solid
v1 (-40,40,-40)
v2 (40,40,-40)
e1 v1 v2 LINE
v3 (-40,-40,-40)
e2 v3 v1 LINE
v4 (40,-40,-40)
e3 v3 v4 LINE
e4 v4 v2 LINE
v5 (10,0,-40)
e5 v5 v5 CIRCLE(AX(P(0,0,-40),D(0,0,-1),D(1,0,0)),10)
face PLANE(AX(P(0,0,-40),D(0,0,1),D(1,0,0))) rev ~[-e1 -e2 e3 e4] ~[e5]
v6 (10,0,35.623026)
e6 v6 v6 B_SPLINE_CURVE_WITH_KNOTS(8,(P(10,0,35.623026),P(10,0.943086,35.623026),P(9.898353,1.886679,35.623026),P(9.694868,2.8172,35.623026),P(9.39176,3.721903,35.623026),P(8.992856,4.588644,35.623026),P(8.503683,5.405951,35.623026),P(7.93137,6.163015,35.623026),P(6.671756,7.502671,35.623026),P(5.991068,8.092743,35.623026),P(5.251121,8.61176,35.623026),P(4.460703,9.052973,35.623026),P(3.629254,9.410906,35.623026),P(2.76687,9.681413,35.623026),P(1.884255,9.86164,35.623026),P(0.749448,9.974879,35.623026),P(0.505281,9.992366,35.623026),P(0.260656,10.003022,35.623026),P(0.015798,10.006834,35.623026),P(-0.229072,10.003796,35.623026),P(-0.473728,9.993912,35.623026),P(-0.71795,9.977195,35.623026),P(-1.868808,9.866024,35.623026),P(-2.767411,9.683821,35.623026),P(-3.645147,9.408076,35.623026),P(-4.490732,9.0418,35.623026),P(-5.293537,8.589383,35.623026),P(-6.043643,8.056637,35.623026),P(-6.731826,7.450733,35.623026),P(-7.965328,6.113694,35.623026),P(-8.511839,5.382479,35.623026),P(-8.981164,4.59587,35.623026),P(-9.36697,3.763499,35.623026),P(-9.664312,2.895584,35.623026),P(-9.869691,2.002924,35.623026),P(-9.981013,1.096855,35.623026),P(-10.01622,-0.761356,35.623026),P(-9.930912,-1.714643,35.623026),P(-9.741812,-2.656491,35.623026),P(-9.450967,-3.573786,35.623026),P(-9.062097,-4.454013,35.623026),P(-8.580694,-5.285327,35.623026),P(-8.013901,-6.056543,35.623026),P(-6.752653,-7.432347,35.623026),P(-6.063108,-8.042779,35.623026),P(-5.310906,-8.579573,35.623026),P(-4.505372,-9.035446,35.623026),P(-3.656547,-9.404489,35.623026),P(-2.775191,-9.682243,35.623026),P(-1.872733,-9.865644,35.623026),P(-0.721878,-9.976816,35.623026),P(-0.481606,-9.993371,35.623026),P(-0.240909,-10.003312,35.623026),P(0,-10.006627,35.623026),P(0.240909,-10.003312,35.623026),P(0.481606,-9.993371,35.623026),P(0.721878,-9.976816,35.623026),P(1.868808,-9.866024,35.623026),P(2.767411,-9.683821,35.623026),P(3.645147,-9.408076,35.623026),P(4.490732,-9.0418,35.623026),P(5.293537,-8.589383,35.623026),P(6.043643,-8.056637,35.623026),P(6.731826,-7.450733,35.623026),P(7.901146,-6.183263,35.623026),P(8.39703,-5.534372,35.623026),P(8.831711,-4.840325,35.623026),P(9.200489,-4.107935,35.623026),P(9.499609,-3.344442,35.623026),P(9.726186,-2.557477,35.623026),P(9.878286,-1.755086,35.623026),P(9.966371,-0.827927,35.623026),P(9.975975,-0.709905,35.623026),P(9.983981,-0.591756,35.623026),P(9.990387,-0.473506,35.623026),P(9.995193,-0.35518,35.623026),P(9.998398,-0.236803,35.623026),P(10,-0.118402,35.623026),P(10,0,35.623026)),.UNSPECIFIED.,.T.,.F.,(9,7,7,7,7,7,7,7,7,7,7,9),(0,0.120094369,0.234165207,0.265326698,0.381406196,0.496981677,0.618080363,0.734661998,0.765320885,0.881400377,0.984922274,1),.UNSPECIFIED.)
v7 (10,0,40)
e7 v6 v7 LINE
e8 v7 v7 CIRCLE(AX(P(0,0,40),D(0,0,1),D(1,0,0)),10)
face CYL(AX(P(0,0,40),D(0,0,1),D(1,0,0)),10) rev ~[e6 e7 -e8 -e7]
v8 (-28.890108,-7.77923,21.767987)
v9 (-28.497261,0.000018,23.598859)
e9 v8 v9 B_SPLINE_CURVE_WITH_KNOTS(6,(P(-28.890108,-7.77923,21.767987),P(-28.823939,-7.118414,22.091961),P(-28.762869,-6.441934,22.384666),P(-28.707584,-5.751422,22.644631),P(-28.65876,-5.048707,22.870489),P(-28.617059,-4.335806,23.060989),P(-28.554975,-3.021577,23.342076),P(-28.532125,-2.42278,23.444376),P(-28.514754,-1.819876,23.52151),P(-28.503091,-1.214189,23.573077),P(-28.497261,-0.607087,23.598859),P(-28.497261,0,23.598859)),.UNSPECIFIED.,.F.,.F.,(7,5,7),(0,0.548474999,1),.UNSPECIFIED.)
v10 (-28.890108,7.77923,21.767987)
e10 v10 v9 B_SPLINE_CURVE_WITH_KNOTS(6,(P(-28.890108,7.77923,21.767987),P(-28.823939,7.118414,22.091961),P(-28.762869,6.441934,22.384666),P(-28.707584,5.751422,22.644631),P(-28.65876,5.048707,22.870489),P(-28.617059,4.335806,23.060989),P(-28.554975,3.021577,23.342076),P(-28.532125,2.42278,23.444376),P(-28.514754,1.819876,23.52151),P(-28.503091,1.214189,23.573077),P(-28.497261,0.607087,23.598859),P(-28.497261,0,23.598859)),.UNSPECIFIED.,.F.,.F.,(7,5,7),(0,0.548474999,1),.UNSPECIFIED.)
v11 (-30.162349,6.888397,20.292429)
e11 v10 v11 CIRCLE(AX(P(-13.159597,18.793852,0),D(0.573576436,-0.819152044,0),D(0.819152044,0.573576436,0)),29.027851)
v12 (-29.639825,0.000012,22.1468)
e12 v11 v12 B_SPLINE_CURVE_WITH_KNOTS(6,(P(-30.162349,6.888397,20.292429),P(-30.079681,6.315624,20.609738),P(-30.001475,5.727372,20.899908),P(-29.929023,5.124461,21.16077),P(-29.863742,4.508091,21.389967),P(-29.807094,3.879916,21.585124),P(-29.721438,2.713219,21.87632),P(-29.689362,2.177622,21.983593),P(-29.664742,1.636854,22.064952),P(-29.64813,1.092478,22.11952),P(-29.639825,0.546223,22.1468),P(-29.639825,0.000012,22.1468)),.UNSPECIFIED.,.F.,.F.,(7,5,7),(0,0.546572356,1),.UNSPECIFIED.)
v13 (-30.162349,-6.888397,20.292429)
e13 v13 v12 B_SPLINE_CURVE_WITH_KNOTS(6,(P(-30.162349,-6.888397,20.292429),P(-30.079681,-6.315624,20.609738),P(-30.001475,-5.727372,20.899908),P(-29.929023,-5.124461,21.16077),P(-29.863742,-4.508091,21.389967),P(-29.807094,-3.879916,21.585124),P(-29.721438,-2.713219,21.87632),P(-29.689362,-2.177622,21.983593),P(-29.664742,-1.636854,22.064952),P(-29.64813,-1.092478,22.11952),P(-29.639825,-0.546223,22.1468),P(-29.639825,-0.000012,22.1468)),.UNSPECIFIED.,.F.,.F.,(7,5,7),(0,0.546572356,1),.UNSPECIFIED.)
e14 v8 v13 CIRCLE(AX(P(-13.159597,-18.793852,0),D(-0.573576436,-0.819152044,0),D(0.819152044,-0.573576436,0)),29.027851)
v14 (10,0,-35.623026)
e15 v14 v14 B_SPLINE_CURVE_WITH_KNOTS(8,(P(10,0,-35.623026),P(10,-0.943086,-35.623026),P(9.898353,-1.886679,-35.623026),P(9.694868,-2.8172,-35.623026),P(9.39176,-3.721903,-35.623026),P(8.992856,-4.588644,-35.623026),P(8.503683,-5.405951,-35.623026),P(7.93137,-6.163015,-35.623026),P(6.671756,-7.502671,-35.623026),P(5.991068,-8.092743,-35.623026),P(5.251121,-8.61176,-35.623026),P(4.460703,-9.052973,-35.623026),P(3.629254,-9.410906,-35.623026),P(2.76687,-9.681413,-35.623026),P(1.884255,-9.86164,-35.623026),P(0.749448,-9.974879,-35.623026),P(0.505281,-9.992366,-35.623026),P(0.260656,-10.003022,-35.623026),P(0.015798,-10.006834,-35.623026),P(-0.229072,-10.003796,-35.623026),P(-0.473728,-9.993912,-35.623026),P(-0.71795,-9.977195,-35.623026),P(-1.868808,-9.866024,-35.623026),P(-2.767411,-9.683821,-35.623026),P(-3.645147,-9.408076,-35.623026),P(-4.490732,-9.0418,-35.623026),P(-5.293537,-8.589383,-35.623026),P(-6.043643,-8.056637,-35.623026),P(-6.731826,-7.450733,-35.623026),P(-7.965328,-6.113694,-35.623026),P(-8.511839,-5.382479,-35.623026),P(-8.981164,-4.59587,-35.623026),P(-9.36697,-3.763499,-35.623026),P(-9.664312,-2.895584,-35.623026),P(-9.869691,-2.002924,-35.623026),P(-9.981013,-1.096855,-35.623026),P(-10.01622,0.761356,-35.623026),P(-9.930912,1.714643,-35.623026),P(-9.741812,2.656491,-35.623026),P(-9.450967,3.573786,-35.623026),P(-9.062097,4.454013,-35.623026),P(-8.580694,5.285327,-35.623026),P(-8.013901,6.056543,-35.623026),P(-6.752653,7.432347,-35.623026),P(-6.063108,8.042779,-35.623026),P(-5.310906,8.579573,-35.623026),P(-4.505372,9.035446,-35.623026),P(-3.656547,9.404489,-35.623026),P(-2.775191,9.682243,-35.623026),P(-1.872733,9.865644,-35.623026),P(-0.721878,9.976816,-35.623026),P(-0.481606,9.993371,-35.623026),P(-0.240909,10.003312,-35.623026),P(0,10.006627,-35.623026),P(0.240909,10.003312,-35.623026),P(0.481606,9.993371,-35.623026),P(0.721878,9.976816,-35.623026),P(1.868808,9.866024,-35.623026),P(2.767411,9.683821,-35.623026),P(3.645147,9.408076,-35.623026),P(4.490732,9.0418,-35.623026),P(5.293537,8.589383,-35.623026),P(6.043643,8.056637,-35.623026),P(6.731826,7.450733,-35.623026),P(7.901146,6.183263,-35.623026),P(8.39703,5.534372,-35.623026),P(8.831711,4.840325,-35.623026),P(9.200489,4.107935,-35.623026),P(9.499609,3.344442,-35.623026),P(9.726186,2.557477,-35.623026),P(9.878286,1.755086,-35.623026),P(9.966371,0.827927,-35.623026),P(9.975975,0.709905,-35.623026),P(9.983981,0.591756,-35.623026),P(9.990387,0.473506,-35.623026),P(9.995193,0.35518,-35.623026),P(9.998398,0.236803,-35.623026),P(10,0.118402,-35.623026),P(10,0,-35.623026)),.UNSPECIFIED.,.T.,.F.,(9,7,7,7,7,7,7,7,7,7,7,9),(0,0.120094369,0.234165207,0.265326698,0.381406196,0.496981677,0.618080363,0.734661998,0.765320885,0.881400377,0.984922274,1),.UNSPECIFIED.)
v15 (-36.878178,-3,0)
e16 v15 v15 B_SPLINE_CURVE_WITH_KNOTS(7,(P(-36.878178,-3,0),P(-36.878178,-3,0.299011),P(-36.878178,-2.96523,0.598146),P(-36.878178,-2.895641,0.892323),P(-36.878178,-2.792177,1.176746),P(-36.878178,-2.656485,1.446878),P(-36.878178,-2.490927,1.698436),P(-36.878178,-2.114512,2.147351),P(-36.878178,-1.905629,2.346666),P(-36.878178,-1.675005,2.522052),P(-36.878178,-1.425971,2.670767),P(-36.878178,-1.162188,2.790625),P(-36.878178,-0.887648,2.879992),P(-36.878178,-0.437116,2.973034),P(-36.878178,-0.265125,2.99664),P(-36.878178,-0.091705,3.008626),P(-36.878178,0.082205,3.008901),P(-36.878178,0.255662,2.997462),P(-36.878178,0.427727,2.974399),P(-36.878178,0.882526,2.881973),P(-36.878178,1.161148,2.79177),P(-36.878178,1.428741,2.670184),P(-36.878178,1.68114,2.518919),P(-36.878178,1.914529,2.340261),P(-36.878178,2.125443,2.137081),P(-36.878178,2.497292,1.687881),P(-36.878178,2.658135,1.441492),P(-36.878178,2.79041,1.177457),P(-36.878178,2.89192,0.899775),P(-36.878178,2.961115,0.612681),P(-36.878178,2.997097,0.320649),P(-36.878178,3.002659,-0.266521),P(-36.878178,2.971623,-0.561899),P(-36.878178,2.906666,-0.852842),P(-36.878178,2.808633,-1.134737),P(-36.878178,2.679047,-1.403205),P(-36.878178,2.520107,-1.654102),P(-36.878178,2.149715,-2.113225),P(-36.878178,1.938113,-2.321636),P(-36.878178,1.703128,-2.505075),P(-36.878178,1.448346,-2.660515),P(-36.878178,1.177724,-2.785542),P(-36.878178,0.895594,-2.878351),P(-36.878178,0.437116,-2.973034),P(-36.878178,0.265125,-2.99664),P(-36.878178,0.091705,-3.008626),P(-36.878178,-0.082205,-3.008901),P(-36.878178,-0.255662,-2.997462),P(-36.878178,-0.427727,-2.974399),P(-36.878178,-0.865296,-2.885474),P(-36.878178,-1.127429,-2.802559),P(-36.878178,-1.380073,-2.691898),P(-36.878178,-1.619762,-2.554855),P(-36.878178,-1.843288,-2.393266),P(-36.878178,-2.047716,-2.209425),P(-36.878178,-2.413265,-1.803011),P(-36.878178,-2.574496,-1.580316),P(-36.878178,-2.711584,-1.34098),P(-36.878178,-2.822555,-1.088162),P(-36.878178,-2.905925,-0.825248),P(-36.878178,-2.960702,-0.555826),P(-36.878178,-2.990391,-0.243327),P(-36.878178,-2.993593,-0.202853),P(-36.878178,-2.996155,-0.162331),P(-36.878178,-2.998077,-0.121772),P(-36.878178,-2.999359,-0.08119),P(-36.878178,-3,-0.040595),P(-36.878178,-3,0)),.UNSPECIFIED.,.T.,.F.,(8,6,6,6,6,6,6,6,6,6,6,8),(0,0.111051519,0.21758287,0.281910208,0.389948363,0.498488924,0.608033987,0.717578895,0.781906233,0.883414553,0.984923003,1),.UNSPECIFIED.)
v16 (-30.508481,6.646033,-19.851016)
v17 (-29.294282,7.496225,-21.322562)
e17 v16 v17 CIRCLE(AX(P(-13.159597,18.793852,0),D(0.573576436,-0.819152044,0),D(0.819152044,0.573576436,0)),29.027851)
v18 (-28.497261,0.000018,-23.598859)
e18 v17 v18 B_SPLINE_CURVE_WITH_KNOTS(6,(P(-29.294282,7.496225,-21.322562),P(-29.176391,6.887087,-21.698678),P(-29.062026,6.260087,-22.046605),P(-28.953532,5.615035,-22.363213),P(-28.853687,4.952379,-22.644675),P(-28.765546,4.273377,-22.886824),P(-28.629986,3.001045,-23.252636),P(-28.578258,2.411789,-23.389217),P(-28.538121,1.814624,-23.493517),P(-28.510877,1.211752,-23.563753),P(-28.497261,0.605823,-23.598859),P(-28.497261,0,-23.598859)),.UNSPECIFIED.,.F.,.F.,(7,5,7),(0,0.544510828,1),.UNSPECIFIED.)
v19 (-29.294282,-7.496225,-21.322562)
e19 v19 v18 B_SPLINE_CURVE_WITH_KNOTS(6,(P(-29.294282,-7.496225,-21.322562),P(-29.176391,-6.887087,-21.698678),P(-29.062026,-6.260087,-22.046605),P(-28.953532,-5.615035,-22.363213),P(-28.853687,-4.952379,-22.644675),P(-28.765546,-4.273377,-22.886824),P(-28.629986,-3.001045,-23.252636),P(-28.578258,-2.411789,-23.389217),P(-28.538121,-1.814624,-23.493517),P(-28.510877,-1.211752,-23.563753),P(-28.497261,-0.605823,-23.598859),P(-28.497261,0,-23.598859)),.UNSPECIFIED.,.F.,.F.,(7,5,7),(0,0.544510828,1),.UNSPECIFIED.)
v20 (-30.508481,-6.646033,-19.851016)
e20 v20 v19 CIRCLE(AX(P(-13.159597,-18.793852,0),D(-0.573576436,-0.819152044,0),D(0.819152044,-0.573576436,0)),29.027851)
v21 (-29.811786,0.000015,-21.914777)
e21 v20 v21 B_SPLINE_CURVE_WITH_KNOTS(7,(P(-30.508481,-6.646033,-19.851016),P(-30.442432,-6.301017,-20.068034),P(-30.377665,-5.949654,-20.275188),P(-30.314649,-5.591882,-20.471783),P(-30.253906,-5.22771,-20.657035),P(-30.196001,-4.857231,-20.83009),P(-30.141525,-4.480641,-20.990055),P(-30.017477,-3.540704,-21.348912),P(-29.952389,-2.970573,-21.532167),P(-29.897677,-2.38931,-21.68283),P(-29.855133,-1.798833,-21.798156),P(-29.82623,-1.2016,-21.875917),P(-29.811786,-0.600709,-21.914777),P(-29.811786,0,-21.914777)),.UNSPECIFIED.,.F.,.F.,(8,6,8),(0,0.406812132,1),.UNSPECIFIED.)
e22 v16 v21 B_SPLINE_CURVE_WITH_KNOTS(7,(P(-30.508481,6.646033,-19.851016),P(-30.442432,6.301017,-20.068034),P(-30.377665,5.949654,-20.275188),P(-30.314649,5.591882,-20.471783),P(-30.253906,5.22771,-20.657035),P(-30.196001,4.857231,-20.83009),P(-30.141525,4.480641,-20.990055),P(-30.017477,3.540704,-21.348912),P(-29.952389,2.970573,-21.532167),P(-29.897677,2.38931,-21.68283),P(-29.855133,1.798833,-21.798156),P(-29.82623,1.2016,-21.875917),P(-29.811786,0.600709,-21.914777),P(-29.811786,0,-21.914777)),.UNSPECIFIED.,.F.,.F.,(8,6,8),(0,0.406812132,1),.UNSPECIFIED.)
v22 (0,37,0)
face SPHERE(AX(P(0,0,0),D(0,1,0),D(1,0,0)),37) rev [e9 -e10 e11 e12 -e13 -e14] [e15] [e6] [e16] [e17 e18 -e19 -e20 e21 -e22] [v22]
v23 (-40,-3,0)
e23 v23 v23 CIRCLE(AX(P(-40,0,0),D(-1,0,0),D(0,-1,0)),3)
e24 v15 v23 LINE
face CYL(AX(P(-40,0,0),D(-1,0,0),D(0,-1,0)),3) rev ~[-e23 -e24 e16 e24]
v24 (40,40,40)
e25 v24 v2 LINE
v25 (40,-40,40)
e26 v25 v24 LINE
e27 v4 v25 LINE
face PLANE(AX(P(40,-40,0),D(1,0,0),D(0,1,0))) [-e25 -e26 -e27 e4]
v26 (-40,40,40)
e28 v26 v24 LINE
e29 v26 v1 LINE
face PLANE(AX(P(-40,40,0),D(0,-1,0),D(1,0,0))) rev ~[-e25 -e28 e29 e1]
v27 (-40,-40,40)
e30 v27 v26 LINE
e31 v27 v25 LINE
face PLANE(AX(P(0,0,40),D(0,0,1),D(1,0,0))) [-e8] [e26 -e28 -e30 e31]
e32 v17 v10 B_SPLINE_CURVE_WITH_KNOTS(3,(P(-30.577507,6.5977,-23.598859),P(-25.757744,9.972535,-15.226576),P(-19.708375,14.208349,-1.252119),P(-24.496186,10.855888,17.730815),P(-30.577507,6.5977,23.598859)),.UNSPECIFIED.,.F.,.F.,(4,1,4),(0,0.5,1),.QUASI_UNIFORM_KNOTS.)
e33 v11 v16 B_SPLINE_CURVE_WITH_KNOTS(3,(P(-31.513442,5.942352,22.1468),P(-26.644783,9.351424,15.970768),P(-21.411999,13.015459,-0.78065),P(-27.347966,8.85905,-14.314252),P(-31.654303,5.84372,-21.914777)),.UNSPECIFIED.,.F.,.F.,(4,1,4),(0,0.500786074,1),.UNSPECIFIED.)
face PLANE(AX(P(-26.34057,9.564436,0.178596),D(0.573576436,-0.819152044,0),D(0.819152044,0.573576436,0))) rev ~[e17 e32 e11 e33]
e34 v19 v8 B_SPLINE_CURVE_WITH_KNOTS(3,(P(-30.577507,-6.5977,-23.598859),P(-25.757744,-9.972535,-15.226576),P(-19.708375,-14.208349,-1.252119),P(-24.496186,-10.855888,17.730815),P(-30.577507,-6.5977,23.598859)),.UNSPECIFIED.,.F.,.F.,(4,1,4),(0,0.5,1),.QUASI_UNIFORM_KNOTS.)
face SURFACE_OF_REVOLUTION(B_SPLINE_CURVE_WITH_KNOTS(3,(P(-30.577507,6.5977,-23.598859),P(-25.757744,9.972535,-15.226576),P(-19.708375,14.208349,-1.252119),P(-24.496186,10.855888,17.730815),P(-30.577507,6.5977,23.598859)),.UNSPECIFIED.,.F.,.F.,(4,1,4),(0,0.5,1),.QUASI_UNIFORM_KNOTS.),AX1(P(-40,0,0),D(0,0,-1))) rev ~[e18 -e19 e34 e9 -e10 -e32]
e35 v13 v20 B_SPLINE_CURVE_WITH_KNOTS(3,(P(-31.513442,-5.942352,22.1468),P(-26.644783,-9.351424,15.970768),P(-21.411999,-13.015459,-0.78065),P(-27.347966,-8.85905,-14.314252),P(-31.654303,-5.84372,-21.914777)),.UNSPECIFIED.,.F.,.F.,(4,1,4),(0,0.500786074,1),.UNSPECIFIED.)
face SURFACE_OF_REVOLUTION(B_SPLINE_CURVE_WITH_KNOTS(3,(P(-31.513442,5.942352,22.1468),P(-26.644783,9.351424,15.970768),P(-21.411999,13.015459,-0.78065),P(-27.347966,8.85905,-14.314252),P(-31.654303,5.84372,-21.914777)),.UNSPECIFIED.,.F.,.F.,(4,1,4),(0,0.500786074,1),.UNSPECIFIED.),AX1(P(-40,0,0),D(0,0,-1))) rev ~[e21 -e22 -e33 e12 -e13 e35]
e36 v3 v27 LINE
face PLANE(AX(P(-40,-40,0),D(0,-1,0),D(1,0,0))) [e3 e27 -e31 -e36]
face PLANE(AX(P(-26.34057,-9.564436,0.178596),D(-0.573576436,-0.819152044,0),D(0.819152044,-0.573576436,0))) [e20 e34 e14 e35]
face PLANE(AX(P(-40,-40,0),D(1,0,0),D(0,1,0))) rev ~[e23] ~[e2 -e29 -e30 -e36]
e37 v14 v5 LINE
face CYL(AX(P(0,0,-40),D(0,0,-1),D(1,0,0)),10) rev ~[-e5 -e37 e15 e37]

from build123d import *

# Parameters (mm, degrees)
F2_W          = 80
F2_H          = 80
F3_DEPTH      = 40
F7_ANGLE_BACK = 35
F7_ANGLE      = 70
F8_R          = 3
F9_DEPTH      = 4
F10_R         = 10
F11_DEPTH     = 5
F12_R         = 10
F13_DEPTH     = 5


# Not quite as in the source:
# - a feature names something its author has since deleted; it is built from what else it names


with BuildPart() as f1:
    # F0 (on Top) → F1 (revolve)
    with BuildSketch(Plane.XY):
        with BuildLine():
            Line((0, 37), (0, -37))
            ThreePointArc((0, -37), (37, 0), (0, 37))
        make_face()
    revolve(axis=Axis((0, 0, 0), (0, -1, 0)))


with BuildPart() as f3:
    # F2 (on Top) → F3 (new body, symmetric)
    with BuildSketch(Plane.XY):
        Rectangle(F2_W, F2_H)
    extrude(amount=F3_DEPTH, both=True)

    # F4: cut F1
    add(f1.part, mode=Mode.SUBTRACT)

    # F6 (on Front) → F7 (revolve)
    with BuildSketch(Plane.XZ, mode=Mode.PRIVATE) as f7_sk:
        with BuildLine():
            add(Edge.make_bspline(
                [(-28.4972605327, -23.5988589159), (-22.613415631, -15.226576282), (-15.2284997687, -1.2521191935), (-21.0733372873, 17.730814669), (-28.4972605327, 23.5988589159)],
                knots=[0, 0, 0, 0, 0.5, 1, 1, 1, 1], degree=3))
            ThreePointArc((-28.4972605327, 23.5988589159), (-29.0776083413, 22.8799626999), (-29.6398253299, 22.1468000942))
            add(Edge.make_bspline(
                [(-29.6398253299, 22.1468000942), (-23.6962903291, 15.970768407), (-17.3082405815, -0.7806496907), (-24.5547182858, -14.3142519519), (-29.8117857382, -21.9147765469)],
                knots=[0, 0, 0, 0, 0.5007860737, 1, 1, 1, 1], degree=3))
            ThreePointArc((-29.8117857382, -21.9147765469), (-29.1666805209, -22.7663072849), (-28.4972605327, -23.5988589159))
        make_face()
    revolve(f7_sk.sketch.rotate(Axis((-40, 0, 0), (0, 0, -1)), -F7_ANGLE_BACK), axis=Axis((-40, 0, 0), (0, 0, -1)), revolution_arc=F7_ANGLE)

    # F8 (on face) → F9 (cut, symmetric)
    with BuildSketch(Plane(origin=(-40, 0, 0), x_dir=(0, -1, 0), z_dir=(-1, 0, 0))):
        Circle(F8_R)
    extrude(amount=F9_DEPTH, both=True, mode=Mode.SUBTRACT)

    # F10 (on face) → F11 (cut, symmetric)
    with BuildSketch(Plane.XY.offset(40)):
        Circle(F10_R)
    extrude(amount=F11_DEPTH, both=True, mode=Mode.SUBTRACT)

    # F12 (on face) → F13 (cut, symmetric)
    with BuildSketch(Plane(origin=(0, 0, -40), x_dir=(1, 0, 0), z_dir=(0, 0, -1))):
        Circle(F12_R)
    extrude(amount=F13_DEPTH, both=True, mode=Mode.SUBTRACT)


solid = f3.part
